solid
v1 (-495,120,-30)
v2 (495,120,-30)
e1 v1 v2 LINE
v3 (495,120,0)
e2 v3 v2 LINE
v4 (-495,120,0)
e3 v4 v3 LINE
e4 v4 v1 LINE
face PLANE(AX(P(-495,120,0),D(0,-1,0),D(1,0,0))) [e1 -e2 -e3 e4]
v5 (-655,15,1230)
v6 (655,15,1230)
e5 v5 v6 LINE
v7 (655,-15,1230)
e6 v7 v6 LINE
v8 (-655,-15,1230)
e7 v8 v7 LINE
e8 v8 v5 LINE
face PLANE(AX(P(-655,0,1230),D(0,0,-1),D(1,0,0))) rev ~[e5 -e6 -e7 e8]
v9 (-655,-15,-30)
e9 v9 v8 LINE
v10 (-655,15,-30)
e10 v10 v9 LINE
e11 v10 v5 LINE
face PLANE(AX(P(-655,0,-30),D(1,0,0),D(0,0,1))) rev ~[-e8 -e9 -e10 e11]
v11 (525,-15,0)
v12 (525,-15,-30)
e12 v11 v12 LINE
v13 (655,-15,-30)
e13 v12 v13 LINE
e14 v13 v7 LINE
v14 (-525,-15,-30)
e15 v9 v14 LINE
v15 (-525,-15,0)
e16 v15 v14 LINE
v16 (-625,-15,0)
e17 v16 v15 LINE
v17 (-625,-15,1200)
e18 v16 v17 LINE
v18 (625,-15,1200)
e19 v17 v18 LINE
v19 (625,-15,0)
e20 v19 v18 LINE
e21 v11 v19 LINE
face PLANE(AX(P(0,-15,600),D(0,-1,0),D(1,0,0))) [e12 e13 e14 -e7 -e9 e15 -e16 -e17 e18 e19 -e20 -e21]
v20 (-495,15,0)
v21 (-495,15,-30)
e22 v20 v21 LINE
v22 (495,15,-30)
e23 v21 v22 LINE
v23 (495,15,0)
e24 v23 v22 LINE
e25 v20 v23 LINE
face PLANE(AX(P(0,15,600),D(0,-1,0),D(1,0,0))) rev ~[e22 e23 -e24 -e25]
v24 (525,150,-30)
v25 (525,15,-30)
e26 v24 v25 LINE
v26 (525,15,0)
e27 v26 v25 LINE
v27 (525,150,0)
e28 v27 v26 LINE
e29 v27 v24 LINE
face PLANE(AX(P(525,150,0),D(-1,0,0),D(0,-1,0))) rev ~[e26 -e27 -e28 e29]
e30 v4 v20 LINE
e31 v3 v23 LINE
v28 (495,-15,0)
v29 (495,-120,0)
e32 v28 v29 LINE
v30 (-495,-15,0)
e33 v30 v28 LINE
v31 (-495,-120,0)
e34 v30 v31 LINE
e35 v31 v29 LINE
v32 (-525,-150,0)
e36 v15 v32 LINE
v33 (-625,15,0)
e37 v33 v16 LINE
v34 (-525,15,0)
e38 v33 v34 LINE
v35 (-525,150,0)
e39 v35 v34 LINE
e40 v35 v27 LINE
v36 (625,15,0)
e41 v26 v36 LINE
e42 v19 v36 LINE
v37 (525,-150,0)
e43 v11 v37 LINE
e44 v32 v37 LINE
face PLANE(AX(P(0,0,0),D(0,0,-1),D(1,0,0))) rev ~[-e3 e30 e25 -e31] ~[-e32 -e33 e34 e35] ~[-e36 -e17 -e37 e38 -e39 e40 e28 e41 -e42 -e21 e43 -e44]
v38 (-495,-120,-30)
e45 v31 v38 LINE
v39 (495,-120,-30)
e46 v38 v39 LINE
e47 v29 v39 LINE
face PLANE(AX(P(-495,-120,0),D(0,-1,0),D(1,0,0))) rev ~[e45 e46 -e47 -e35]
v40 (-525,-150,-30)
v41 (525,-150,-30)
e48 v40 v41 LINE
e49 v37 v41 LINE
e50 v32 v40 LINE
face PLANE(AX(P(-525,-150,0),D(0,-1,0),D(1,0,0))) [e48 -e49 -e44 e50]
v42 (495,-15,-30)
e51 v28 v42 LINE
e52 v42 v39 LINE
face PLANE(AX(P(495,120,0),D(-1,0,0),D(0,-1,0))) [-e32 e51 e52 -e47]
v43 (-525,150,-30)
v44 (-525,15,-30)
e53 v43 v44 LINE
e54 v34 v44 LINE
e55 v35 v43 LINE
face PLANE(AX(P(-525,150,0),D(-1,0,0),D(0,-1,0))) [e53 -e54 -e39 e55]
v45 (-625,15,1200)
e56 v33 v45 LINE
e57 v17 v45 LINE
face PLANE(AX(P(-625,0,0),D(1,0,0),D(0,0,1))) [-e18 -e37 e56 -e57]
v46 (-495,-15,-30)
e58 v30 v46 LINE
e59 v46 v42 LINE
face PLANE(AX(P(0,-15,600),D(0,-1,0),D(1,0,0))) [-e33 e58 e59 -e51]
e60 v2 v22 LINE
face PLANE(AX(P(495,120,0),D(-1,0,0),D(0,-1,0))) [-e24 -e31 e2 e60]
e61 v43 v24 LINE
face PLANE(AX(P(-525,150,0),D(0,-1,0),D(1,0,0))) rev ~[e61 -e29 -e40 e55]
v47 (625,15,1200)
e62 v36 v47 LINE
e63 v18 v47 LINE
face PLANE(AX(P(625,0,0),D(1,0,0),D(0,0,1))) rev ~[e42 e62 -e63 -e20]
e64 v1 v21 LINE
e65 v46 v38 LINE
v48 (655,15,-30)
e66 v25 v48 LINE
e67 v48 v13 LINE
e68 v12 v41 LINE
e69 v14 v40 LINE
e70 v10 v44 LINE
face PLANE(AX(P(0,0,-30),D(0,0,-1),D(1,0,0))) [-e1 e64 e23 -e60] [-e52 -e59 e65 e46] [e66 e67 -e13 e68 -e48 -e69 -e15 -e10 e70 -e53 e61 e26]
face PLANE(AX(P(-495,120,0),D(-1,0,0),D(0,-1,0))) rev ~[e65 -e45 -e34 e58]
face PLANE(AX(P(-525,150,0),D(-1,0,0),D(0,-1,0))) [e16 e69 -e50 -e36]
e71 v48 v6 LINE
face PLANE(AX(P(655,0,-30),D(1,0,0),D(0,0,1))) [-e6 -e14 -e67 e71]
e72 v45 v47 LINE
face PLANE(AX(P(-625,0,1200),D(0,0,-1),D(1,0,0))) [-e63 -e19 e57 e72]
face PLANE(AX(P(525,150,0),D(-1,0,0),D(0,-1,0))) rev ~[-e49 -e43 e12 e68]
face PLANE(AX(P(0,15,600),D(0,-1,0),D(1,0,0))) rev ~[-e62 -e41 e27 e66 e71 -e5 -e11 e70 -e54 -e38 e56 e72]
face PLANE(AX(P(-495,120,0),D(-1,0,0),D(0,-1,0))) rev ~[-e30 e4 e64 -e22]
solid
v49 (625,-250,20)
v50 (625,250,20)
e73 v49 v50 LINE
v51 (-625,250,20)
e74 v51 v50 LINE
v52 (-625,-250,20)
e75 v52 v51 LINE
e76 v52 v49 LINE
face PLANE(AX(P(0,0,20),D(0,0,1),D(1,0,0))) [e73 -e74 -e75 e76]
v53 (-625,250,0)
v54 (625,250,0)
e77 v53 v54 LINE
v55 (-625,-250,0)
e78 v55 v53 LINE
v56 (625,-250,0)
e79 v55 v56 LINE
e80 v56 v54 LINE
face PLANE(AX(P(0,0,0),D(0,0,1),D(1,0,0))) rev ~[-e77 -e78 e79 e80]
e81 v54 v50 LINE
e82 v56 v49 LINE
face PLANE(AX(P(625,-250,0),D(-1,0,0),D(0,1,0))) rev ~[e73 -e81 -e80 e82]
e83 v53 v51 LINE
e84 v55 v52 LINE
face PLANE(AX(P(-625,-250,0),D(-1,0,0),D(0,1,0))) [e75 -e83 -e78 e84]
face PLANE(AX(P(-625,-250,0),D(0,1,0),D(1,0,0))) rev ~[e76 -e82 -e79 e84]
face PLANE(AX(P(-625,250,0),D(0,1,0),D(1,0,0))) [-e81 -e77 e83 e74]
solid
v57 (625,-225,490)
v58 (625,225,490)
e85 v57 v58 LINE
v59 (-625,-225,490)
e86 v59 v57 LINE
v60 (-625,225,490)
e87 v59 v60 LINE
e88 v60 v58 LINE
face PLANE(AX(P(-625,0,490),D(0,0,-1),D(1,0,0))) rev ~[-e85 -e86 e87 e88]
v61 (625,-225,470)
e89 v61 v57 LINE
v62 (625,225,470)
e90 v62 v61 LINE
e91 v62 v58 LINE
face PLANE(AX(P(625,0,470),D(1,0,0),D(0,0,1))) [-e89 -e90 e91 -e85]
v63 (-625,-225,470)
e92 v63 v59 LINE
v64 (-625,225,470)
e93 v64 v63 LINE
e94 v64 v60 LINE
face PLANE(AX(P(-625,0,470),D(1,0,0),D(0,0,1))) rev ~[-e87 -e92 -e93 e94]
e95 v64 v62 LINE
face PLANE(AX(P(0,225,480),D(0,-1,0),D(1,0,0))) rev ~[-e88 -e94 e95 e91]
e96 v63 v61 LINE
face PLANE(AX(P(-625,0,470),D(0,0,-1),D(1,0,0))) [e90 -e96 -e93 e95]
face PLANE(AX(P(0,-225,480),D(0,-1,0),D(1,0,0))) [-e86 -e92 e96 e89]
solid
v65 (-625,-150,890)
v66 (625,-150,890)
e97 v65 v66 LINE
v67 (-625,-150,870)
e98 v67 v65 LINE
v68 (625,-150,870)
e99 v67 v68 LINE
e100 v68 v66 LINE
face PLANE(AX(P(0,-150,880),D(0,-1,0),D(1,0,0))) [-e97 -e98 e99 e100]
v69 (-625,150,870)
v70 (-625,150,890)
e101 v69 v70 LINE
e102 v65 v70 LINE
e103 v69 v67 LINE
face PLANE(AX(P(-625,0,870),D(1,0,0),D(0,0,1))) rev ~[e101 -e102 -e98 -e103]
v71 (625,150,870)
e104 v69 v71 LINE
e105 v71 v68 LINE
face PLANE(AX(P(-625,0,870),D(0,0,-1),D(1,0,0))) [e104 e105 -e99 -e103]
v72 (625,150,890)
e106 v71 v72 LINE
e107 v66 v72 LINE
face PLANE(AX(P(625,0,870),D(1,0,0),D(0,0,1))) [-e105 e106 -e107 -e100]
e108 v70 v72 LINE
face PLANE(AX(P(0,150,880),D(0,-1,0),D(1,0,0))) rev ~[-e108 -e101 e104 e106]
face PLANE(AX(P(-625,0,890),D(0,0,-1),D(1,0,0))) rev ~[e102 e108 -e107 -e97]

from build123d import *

# Parameters (mm, degrees)
F0_W     = 1250
F0_H     = 500
F1_DEPTH = 20
F2_W     = 1310
F2_H     = 1260
F2_W_2   = 1250
F2_H_2   = 1200
F3_DEPTH = 15
F4_W     = 1050
F4_H     = 300
F4_W_2   = 990
F4_H_2   = 240
F5_DEPTH = 30
F6_W     = 1250
F6_H     = 20
F7_DEPTH = 150
F8_W     = 1250
F8_H     = 20
F9_DEPTH = 225


with BuildPart() as f1:
    # F0 (on Top) → F1 (new body)
    with BuildSketch(Plane.XY):
        Rectangle(F0_W, F0_H)
    extrude(amount=F1_DEPTH)


with BuildPart() as f3:
    # F2 (on Front) → F3 (new body, symmetric)
    with BuildSketch(Plane.XZ):
        with Locations((0, 600)):
            Rectangle(F2_W, F2_H)
        with Locations((0, 600)):
            Rectangle(F2_W_2, F2_H_2, mode=Mode.SUBTRACT)
    extrude(amount=F3_DEPTH, both=True)

    # F4 (on face) → F5 (join)
    with BuildSketch(Plane(origin=(0, 0, 0), x_dir=(1, 0, 0), z_dir=(0, 0, -1))):
        Rectangle(F4_W, F4_H)
        Rectangle(F4_W_2, F4_H_2, mode=Mode.SUBTRACT)
    extrude(amount=F5_DEPTH)


with BuildPart() as f7:
    # F6 (on Front) → F7 (new body, symmetric)
    with BuildSketch(Plane.XZ):
        with Locations((0, 880)):
            Rectangle(F6_W, F6_H)
    extrude(amount=F7_DEPTH, both=True)


with BuildPart() as f9:
    # F8 (on Front) → F9 (new body, symmetric)
    with BuildSketch(Plane.XZ):
        with Locations((0, 480)):
            Rectangle(F8_W, F8_H)
    extrude(amount=F9_DEPTH, both=True)


solid = Compound([f1.part, f3.part, f7.part, f9.part])
